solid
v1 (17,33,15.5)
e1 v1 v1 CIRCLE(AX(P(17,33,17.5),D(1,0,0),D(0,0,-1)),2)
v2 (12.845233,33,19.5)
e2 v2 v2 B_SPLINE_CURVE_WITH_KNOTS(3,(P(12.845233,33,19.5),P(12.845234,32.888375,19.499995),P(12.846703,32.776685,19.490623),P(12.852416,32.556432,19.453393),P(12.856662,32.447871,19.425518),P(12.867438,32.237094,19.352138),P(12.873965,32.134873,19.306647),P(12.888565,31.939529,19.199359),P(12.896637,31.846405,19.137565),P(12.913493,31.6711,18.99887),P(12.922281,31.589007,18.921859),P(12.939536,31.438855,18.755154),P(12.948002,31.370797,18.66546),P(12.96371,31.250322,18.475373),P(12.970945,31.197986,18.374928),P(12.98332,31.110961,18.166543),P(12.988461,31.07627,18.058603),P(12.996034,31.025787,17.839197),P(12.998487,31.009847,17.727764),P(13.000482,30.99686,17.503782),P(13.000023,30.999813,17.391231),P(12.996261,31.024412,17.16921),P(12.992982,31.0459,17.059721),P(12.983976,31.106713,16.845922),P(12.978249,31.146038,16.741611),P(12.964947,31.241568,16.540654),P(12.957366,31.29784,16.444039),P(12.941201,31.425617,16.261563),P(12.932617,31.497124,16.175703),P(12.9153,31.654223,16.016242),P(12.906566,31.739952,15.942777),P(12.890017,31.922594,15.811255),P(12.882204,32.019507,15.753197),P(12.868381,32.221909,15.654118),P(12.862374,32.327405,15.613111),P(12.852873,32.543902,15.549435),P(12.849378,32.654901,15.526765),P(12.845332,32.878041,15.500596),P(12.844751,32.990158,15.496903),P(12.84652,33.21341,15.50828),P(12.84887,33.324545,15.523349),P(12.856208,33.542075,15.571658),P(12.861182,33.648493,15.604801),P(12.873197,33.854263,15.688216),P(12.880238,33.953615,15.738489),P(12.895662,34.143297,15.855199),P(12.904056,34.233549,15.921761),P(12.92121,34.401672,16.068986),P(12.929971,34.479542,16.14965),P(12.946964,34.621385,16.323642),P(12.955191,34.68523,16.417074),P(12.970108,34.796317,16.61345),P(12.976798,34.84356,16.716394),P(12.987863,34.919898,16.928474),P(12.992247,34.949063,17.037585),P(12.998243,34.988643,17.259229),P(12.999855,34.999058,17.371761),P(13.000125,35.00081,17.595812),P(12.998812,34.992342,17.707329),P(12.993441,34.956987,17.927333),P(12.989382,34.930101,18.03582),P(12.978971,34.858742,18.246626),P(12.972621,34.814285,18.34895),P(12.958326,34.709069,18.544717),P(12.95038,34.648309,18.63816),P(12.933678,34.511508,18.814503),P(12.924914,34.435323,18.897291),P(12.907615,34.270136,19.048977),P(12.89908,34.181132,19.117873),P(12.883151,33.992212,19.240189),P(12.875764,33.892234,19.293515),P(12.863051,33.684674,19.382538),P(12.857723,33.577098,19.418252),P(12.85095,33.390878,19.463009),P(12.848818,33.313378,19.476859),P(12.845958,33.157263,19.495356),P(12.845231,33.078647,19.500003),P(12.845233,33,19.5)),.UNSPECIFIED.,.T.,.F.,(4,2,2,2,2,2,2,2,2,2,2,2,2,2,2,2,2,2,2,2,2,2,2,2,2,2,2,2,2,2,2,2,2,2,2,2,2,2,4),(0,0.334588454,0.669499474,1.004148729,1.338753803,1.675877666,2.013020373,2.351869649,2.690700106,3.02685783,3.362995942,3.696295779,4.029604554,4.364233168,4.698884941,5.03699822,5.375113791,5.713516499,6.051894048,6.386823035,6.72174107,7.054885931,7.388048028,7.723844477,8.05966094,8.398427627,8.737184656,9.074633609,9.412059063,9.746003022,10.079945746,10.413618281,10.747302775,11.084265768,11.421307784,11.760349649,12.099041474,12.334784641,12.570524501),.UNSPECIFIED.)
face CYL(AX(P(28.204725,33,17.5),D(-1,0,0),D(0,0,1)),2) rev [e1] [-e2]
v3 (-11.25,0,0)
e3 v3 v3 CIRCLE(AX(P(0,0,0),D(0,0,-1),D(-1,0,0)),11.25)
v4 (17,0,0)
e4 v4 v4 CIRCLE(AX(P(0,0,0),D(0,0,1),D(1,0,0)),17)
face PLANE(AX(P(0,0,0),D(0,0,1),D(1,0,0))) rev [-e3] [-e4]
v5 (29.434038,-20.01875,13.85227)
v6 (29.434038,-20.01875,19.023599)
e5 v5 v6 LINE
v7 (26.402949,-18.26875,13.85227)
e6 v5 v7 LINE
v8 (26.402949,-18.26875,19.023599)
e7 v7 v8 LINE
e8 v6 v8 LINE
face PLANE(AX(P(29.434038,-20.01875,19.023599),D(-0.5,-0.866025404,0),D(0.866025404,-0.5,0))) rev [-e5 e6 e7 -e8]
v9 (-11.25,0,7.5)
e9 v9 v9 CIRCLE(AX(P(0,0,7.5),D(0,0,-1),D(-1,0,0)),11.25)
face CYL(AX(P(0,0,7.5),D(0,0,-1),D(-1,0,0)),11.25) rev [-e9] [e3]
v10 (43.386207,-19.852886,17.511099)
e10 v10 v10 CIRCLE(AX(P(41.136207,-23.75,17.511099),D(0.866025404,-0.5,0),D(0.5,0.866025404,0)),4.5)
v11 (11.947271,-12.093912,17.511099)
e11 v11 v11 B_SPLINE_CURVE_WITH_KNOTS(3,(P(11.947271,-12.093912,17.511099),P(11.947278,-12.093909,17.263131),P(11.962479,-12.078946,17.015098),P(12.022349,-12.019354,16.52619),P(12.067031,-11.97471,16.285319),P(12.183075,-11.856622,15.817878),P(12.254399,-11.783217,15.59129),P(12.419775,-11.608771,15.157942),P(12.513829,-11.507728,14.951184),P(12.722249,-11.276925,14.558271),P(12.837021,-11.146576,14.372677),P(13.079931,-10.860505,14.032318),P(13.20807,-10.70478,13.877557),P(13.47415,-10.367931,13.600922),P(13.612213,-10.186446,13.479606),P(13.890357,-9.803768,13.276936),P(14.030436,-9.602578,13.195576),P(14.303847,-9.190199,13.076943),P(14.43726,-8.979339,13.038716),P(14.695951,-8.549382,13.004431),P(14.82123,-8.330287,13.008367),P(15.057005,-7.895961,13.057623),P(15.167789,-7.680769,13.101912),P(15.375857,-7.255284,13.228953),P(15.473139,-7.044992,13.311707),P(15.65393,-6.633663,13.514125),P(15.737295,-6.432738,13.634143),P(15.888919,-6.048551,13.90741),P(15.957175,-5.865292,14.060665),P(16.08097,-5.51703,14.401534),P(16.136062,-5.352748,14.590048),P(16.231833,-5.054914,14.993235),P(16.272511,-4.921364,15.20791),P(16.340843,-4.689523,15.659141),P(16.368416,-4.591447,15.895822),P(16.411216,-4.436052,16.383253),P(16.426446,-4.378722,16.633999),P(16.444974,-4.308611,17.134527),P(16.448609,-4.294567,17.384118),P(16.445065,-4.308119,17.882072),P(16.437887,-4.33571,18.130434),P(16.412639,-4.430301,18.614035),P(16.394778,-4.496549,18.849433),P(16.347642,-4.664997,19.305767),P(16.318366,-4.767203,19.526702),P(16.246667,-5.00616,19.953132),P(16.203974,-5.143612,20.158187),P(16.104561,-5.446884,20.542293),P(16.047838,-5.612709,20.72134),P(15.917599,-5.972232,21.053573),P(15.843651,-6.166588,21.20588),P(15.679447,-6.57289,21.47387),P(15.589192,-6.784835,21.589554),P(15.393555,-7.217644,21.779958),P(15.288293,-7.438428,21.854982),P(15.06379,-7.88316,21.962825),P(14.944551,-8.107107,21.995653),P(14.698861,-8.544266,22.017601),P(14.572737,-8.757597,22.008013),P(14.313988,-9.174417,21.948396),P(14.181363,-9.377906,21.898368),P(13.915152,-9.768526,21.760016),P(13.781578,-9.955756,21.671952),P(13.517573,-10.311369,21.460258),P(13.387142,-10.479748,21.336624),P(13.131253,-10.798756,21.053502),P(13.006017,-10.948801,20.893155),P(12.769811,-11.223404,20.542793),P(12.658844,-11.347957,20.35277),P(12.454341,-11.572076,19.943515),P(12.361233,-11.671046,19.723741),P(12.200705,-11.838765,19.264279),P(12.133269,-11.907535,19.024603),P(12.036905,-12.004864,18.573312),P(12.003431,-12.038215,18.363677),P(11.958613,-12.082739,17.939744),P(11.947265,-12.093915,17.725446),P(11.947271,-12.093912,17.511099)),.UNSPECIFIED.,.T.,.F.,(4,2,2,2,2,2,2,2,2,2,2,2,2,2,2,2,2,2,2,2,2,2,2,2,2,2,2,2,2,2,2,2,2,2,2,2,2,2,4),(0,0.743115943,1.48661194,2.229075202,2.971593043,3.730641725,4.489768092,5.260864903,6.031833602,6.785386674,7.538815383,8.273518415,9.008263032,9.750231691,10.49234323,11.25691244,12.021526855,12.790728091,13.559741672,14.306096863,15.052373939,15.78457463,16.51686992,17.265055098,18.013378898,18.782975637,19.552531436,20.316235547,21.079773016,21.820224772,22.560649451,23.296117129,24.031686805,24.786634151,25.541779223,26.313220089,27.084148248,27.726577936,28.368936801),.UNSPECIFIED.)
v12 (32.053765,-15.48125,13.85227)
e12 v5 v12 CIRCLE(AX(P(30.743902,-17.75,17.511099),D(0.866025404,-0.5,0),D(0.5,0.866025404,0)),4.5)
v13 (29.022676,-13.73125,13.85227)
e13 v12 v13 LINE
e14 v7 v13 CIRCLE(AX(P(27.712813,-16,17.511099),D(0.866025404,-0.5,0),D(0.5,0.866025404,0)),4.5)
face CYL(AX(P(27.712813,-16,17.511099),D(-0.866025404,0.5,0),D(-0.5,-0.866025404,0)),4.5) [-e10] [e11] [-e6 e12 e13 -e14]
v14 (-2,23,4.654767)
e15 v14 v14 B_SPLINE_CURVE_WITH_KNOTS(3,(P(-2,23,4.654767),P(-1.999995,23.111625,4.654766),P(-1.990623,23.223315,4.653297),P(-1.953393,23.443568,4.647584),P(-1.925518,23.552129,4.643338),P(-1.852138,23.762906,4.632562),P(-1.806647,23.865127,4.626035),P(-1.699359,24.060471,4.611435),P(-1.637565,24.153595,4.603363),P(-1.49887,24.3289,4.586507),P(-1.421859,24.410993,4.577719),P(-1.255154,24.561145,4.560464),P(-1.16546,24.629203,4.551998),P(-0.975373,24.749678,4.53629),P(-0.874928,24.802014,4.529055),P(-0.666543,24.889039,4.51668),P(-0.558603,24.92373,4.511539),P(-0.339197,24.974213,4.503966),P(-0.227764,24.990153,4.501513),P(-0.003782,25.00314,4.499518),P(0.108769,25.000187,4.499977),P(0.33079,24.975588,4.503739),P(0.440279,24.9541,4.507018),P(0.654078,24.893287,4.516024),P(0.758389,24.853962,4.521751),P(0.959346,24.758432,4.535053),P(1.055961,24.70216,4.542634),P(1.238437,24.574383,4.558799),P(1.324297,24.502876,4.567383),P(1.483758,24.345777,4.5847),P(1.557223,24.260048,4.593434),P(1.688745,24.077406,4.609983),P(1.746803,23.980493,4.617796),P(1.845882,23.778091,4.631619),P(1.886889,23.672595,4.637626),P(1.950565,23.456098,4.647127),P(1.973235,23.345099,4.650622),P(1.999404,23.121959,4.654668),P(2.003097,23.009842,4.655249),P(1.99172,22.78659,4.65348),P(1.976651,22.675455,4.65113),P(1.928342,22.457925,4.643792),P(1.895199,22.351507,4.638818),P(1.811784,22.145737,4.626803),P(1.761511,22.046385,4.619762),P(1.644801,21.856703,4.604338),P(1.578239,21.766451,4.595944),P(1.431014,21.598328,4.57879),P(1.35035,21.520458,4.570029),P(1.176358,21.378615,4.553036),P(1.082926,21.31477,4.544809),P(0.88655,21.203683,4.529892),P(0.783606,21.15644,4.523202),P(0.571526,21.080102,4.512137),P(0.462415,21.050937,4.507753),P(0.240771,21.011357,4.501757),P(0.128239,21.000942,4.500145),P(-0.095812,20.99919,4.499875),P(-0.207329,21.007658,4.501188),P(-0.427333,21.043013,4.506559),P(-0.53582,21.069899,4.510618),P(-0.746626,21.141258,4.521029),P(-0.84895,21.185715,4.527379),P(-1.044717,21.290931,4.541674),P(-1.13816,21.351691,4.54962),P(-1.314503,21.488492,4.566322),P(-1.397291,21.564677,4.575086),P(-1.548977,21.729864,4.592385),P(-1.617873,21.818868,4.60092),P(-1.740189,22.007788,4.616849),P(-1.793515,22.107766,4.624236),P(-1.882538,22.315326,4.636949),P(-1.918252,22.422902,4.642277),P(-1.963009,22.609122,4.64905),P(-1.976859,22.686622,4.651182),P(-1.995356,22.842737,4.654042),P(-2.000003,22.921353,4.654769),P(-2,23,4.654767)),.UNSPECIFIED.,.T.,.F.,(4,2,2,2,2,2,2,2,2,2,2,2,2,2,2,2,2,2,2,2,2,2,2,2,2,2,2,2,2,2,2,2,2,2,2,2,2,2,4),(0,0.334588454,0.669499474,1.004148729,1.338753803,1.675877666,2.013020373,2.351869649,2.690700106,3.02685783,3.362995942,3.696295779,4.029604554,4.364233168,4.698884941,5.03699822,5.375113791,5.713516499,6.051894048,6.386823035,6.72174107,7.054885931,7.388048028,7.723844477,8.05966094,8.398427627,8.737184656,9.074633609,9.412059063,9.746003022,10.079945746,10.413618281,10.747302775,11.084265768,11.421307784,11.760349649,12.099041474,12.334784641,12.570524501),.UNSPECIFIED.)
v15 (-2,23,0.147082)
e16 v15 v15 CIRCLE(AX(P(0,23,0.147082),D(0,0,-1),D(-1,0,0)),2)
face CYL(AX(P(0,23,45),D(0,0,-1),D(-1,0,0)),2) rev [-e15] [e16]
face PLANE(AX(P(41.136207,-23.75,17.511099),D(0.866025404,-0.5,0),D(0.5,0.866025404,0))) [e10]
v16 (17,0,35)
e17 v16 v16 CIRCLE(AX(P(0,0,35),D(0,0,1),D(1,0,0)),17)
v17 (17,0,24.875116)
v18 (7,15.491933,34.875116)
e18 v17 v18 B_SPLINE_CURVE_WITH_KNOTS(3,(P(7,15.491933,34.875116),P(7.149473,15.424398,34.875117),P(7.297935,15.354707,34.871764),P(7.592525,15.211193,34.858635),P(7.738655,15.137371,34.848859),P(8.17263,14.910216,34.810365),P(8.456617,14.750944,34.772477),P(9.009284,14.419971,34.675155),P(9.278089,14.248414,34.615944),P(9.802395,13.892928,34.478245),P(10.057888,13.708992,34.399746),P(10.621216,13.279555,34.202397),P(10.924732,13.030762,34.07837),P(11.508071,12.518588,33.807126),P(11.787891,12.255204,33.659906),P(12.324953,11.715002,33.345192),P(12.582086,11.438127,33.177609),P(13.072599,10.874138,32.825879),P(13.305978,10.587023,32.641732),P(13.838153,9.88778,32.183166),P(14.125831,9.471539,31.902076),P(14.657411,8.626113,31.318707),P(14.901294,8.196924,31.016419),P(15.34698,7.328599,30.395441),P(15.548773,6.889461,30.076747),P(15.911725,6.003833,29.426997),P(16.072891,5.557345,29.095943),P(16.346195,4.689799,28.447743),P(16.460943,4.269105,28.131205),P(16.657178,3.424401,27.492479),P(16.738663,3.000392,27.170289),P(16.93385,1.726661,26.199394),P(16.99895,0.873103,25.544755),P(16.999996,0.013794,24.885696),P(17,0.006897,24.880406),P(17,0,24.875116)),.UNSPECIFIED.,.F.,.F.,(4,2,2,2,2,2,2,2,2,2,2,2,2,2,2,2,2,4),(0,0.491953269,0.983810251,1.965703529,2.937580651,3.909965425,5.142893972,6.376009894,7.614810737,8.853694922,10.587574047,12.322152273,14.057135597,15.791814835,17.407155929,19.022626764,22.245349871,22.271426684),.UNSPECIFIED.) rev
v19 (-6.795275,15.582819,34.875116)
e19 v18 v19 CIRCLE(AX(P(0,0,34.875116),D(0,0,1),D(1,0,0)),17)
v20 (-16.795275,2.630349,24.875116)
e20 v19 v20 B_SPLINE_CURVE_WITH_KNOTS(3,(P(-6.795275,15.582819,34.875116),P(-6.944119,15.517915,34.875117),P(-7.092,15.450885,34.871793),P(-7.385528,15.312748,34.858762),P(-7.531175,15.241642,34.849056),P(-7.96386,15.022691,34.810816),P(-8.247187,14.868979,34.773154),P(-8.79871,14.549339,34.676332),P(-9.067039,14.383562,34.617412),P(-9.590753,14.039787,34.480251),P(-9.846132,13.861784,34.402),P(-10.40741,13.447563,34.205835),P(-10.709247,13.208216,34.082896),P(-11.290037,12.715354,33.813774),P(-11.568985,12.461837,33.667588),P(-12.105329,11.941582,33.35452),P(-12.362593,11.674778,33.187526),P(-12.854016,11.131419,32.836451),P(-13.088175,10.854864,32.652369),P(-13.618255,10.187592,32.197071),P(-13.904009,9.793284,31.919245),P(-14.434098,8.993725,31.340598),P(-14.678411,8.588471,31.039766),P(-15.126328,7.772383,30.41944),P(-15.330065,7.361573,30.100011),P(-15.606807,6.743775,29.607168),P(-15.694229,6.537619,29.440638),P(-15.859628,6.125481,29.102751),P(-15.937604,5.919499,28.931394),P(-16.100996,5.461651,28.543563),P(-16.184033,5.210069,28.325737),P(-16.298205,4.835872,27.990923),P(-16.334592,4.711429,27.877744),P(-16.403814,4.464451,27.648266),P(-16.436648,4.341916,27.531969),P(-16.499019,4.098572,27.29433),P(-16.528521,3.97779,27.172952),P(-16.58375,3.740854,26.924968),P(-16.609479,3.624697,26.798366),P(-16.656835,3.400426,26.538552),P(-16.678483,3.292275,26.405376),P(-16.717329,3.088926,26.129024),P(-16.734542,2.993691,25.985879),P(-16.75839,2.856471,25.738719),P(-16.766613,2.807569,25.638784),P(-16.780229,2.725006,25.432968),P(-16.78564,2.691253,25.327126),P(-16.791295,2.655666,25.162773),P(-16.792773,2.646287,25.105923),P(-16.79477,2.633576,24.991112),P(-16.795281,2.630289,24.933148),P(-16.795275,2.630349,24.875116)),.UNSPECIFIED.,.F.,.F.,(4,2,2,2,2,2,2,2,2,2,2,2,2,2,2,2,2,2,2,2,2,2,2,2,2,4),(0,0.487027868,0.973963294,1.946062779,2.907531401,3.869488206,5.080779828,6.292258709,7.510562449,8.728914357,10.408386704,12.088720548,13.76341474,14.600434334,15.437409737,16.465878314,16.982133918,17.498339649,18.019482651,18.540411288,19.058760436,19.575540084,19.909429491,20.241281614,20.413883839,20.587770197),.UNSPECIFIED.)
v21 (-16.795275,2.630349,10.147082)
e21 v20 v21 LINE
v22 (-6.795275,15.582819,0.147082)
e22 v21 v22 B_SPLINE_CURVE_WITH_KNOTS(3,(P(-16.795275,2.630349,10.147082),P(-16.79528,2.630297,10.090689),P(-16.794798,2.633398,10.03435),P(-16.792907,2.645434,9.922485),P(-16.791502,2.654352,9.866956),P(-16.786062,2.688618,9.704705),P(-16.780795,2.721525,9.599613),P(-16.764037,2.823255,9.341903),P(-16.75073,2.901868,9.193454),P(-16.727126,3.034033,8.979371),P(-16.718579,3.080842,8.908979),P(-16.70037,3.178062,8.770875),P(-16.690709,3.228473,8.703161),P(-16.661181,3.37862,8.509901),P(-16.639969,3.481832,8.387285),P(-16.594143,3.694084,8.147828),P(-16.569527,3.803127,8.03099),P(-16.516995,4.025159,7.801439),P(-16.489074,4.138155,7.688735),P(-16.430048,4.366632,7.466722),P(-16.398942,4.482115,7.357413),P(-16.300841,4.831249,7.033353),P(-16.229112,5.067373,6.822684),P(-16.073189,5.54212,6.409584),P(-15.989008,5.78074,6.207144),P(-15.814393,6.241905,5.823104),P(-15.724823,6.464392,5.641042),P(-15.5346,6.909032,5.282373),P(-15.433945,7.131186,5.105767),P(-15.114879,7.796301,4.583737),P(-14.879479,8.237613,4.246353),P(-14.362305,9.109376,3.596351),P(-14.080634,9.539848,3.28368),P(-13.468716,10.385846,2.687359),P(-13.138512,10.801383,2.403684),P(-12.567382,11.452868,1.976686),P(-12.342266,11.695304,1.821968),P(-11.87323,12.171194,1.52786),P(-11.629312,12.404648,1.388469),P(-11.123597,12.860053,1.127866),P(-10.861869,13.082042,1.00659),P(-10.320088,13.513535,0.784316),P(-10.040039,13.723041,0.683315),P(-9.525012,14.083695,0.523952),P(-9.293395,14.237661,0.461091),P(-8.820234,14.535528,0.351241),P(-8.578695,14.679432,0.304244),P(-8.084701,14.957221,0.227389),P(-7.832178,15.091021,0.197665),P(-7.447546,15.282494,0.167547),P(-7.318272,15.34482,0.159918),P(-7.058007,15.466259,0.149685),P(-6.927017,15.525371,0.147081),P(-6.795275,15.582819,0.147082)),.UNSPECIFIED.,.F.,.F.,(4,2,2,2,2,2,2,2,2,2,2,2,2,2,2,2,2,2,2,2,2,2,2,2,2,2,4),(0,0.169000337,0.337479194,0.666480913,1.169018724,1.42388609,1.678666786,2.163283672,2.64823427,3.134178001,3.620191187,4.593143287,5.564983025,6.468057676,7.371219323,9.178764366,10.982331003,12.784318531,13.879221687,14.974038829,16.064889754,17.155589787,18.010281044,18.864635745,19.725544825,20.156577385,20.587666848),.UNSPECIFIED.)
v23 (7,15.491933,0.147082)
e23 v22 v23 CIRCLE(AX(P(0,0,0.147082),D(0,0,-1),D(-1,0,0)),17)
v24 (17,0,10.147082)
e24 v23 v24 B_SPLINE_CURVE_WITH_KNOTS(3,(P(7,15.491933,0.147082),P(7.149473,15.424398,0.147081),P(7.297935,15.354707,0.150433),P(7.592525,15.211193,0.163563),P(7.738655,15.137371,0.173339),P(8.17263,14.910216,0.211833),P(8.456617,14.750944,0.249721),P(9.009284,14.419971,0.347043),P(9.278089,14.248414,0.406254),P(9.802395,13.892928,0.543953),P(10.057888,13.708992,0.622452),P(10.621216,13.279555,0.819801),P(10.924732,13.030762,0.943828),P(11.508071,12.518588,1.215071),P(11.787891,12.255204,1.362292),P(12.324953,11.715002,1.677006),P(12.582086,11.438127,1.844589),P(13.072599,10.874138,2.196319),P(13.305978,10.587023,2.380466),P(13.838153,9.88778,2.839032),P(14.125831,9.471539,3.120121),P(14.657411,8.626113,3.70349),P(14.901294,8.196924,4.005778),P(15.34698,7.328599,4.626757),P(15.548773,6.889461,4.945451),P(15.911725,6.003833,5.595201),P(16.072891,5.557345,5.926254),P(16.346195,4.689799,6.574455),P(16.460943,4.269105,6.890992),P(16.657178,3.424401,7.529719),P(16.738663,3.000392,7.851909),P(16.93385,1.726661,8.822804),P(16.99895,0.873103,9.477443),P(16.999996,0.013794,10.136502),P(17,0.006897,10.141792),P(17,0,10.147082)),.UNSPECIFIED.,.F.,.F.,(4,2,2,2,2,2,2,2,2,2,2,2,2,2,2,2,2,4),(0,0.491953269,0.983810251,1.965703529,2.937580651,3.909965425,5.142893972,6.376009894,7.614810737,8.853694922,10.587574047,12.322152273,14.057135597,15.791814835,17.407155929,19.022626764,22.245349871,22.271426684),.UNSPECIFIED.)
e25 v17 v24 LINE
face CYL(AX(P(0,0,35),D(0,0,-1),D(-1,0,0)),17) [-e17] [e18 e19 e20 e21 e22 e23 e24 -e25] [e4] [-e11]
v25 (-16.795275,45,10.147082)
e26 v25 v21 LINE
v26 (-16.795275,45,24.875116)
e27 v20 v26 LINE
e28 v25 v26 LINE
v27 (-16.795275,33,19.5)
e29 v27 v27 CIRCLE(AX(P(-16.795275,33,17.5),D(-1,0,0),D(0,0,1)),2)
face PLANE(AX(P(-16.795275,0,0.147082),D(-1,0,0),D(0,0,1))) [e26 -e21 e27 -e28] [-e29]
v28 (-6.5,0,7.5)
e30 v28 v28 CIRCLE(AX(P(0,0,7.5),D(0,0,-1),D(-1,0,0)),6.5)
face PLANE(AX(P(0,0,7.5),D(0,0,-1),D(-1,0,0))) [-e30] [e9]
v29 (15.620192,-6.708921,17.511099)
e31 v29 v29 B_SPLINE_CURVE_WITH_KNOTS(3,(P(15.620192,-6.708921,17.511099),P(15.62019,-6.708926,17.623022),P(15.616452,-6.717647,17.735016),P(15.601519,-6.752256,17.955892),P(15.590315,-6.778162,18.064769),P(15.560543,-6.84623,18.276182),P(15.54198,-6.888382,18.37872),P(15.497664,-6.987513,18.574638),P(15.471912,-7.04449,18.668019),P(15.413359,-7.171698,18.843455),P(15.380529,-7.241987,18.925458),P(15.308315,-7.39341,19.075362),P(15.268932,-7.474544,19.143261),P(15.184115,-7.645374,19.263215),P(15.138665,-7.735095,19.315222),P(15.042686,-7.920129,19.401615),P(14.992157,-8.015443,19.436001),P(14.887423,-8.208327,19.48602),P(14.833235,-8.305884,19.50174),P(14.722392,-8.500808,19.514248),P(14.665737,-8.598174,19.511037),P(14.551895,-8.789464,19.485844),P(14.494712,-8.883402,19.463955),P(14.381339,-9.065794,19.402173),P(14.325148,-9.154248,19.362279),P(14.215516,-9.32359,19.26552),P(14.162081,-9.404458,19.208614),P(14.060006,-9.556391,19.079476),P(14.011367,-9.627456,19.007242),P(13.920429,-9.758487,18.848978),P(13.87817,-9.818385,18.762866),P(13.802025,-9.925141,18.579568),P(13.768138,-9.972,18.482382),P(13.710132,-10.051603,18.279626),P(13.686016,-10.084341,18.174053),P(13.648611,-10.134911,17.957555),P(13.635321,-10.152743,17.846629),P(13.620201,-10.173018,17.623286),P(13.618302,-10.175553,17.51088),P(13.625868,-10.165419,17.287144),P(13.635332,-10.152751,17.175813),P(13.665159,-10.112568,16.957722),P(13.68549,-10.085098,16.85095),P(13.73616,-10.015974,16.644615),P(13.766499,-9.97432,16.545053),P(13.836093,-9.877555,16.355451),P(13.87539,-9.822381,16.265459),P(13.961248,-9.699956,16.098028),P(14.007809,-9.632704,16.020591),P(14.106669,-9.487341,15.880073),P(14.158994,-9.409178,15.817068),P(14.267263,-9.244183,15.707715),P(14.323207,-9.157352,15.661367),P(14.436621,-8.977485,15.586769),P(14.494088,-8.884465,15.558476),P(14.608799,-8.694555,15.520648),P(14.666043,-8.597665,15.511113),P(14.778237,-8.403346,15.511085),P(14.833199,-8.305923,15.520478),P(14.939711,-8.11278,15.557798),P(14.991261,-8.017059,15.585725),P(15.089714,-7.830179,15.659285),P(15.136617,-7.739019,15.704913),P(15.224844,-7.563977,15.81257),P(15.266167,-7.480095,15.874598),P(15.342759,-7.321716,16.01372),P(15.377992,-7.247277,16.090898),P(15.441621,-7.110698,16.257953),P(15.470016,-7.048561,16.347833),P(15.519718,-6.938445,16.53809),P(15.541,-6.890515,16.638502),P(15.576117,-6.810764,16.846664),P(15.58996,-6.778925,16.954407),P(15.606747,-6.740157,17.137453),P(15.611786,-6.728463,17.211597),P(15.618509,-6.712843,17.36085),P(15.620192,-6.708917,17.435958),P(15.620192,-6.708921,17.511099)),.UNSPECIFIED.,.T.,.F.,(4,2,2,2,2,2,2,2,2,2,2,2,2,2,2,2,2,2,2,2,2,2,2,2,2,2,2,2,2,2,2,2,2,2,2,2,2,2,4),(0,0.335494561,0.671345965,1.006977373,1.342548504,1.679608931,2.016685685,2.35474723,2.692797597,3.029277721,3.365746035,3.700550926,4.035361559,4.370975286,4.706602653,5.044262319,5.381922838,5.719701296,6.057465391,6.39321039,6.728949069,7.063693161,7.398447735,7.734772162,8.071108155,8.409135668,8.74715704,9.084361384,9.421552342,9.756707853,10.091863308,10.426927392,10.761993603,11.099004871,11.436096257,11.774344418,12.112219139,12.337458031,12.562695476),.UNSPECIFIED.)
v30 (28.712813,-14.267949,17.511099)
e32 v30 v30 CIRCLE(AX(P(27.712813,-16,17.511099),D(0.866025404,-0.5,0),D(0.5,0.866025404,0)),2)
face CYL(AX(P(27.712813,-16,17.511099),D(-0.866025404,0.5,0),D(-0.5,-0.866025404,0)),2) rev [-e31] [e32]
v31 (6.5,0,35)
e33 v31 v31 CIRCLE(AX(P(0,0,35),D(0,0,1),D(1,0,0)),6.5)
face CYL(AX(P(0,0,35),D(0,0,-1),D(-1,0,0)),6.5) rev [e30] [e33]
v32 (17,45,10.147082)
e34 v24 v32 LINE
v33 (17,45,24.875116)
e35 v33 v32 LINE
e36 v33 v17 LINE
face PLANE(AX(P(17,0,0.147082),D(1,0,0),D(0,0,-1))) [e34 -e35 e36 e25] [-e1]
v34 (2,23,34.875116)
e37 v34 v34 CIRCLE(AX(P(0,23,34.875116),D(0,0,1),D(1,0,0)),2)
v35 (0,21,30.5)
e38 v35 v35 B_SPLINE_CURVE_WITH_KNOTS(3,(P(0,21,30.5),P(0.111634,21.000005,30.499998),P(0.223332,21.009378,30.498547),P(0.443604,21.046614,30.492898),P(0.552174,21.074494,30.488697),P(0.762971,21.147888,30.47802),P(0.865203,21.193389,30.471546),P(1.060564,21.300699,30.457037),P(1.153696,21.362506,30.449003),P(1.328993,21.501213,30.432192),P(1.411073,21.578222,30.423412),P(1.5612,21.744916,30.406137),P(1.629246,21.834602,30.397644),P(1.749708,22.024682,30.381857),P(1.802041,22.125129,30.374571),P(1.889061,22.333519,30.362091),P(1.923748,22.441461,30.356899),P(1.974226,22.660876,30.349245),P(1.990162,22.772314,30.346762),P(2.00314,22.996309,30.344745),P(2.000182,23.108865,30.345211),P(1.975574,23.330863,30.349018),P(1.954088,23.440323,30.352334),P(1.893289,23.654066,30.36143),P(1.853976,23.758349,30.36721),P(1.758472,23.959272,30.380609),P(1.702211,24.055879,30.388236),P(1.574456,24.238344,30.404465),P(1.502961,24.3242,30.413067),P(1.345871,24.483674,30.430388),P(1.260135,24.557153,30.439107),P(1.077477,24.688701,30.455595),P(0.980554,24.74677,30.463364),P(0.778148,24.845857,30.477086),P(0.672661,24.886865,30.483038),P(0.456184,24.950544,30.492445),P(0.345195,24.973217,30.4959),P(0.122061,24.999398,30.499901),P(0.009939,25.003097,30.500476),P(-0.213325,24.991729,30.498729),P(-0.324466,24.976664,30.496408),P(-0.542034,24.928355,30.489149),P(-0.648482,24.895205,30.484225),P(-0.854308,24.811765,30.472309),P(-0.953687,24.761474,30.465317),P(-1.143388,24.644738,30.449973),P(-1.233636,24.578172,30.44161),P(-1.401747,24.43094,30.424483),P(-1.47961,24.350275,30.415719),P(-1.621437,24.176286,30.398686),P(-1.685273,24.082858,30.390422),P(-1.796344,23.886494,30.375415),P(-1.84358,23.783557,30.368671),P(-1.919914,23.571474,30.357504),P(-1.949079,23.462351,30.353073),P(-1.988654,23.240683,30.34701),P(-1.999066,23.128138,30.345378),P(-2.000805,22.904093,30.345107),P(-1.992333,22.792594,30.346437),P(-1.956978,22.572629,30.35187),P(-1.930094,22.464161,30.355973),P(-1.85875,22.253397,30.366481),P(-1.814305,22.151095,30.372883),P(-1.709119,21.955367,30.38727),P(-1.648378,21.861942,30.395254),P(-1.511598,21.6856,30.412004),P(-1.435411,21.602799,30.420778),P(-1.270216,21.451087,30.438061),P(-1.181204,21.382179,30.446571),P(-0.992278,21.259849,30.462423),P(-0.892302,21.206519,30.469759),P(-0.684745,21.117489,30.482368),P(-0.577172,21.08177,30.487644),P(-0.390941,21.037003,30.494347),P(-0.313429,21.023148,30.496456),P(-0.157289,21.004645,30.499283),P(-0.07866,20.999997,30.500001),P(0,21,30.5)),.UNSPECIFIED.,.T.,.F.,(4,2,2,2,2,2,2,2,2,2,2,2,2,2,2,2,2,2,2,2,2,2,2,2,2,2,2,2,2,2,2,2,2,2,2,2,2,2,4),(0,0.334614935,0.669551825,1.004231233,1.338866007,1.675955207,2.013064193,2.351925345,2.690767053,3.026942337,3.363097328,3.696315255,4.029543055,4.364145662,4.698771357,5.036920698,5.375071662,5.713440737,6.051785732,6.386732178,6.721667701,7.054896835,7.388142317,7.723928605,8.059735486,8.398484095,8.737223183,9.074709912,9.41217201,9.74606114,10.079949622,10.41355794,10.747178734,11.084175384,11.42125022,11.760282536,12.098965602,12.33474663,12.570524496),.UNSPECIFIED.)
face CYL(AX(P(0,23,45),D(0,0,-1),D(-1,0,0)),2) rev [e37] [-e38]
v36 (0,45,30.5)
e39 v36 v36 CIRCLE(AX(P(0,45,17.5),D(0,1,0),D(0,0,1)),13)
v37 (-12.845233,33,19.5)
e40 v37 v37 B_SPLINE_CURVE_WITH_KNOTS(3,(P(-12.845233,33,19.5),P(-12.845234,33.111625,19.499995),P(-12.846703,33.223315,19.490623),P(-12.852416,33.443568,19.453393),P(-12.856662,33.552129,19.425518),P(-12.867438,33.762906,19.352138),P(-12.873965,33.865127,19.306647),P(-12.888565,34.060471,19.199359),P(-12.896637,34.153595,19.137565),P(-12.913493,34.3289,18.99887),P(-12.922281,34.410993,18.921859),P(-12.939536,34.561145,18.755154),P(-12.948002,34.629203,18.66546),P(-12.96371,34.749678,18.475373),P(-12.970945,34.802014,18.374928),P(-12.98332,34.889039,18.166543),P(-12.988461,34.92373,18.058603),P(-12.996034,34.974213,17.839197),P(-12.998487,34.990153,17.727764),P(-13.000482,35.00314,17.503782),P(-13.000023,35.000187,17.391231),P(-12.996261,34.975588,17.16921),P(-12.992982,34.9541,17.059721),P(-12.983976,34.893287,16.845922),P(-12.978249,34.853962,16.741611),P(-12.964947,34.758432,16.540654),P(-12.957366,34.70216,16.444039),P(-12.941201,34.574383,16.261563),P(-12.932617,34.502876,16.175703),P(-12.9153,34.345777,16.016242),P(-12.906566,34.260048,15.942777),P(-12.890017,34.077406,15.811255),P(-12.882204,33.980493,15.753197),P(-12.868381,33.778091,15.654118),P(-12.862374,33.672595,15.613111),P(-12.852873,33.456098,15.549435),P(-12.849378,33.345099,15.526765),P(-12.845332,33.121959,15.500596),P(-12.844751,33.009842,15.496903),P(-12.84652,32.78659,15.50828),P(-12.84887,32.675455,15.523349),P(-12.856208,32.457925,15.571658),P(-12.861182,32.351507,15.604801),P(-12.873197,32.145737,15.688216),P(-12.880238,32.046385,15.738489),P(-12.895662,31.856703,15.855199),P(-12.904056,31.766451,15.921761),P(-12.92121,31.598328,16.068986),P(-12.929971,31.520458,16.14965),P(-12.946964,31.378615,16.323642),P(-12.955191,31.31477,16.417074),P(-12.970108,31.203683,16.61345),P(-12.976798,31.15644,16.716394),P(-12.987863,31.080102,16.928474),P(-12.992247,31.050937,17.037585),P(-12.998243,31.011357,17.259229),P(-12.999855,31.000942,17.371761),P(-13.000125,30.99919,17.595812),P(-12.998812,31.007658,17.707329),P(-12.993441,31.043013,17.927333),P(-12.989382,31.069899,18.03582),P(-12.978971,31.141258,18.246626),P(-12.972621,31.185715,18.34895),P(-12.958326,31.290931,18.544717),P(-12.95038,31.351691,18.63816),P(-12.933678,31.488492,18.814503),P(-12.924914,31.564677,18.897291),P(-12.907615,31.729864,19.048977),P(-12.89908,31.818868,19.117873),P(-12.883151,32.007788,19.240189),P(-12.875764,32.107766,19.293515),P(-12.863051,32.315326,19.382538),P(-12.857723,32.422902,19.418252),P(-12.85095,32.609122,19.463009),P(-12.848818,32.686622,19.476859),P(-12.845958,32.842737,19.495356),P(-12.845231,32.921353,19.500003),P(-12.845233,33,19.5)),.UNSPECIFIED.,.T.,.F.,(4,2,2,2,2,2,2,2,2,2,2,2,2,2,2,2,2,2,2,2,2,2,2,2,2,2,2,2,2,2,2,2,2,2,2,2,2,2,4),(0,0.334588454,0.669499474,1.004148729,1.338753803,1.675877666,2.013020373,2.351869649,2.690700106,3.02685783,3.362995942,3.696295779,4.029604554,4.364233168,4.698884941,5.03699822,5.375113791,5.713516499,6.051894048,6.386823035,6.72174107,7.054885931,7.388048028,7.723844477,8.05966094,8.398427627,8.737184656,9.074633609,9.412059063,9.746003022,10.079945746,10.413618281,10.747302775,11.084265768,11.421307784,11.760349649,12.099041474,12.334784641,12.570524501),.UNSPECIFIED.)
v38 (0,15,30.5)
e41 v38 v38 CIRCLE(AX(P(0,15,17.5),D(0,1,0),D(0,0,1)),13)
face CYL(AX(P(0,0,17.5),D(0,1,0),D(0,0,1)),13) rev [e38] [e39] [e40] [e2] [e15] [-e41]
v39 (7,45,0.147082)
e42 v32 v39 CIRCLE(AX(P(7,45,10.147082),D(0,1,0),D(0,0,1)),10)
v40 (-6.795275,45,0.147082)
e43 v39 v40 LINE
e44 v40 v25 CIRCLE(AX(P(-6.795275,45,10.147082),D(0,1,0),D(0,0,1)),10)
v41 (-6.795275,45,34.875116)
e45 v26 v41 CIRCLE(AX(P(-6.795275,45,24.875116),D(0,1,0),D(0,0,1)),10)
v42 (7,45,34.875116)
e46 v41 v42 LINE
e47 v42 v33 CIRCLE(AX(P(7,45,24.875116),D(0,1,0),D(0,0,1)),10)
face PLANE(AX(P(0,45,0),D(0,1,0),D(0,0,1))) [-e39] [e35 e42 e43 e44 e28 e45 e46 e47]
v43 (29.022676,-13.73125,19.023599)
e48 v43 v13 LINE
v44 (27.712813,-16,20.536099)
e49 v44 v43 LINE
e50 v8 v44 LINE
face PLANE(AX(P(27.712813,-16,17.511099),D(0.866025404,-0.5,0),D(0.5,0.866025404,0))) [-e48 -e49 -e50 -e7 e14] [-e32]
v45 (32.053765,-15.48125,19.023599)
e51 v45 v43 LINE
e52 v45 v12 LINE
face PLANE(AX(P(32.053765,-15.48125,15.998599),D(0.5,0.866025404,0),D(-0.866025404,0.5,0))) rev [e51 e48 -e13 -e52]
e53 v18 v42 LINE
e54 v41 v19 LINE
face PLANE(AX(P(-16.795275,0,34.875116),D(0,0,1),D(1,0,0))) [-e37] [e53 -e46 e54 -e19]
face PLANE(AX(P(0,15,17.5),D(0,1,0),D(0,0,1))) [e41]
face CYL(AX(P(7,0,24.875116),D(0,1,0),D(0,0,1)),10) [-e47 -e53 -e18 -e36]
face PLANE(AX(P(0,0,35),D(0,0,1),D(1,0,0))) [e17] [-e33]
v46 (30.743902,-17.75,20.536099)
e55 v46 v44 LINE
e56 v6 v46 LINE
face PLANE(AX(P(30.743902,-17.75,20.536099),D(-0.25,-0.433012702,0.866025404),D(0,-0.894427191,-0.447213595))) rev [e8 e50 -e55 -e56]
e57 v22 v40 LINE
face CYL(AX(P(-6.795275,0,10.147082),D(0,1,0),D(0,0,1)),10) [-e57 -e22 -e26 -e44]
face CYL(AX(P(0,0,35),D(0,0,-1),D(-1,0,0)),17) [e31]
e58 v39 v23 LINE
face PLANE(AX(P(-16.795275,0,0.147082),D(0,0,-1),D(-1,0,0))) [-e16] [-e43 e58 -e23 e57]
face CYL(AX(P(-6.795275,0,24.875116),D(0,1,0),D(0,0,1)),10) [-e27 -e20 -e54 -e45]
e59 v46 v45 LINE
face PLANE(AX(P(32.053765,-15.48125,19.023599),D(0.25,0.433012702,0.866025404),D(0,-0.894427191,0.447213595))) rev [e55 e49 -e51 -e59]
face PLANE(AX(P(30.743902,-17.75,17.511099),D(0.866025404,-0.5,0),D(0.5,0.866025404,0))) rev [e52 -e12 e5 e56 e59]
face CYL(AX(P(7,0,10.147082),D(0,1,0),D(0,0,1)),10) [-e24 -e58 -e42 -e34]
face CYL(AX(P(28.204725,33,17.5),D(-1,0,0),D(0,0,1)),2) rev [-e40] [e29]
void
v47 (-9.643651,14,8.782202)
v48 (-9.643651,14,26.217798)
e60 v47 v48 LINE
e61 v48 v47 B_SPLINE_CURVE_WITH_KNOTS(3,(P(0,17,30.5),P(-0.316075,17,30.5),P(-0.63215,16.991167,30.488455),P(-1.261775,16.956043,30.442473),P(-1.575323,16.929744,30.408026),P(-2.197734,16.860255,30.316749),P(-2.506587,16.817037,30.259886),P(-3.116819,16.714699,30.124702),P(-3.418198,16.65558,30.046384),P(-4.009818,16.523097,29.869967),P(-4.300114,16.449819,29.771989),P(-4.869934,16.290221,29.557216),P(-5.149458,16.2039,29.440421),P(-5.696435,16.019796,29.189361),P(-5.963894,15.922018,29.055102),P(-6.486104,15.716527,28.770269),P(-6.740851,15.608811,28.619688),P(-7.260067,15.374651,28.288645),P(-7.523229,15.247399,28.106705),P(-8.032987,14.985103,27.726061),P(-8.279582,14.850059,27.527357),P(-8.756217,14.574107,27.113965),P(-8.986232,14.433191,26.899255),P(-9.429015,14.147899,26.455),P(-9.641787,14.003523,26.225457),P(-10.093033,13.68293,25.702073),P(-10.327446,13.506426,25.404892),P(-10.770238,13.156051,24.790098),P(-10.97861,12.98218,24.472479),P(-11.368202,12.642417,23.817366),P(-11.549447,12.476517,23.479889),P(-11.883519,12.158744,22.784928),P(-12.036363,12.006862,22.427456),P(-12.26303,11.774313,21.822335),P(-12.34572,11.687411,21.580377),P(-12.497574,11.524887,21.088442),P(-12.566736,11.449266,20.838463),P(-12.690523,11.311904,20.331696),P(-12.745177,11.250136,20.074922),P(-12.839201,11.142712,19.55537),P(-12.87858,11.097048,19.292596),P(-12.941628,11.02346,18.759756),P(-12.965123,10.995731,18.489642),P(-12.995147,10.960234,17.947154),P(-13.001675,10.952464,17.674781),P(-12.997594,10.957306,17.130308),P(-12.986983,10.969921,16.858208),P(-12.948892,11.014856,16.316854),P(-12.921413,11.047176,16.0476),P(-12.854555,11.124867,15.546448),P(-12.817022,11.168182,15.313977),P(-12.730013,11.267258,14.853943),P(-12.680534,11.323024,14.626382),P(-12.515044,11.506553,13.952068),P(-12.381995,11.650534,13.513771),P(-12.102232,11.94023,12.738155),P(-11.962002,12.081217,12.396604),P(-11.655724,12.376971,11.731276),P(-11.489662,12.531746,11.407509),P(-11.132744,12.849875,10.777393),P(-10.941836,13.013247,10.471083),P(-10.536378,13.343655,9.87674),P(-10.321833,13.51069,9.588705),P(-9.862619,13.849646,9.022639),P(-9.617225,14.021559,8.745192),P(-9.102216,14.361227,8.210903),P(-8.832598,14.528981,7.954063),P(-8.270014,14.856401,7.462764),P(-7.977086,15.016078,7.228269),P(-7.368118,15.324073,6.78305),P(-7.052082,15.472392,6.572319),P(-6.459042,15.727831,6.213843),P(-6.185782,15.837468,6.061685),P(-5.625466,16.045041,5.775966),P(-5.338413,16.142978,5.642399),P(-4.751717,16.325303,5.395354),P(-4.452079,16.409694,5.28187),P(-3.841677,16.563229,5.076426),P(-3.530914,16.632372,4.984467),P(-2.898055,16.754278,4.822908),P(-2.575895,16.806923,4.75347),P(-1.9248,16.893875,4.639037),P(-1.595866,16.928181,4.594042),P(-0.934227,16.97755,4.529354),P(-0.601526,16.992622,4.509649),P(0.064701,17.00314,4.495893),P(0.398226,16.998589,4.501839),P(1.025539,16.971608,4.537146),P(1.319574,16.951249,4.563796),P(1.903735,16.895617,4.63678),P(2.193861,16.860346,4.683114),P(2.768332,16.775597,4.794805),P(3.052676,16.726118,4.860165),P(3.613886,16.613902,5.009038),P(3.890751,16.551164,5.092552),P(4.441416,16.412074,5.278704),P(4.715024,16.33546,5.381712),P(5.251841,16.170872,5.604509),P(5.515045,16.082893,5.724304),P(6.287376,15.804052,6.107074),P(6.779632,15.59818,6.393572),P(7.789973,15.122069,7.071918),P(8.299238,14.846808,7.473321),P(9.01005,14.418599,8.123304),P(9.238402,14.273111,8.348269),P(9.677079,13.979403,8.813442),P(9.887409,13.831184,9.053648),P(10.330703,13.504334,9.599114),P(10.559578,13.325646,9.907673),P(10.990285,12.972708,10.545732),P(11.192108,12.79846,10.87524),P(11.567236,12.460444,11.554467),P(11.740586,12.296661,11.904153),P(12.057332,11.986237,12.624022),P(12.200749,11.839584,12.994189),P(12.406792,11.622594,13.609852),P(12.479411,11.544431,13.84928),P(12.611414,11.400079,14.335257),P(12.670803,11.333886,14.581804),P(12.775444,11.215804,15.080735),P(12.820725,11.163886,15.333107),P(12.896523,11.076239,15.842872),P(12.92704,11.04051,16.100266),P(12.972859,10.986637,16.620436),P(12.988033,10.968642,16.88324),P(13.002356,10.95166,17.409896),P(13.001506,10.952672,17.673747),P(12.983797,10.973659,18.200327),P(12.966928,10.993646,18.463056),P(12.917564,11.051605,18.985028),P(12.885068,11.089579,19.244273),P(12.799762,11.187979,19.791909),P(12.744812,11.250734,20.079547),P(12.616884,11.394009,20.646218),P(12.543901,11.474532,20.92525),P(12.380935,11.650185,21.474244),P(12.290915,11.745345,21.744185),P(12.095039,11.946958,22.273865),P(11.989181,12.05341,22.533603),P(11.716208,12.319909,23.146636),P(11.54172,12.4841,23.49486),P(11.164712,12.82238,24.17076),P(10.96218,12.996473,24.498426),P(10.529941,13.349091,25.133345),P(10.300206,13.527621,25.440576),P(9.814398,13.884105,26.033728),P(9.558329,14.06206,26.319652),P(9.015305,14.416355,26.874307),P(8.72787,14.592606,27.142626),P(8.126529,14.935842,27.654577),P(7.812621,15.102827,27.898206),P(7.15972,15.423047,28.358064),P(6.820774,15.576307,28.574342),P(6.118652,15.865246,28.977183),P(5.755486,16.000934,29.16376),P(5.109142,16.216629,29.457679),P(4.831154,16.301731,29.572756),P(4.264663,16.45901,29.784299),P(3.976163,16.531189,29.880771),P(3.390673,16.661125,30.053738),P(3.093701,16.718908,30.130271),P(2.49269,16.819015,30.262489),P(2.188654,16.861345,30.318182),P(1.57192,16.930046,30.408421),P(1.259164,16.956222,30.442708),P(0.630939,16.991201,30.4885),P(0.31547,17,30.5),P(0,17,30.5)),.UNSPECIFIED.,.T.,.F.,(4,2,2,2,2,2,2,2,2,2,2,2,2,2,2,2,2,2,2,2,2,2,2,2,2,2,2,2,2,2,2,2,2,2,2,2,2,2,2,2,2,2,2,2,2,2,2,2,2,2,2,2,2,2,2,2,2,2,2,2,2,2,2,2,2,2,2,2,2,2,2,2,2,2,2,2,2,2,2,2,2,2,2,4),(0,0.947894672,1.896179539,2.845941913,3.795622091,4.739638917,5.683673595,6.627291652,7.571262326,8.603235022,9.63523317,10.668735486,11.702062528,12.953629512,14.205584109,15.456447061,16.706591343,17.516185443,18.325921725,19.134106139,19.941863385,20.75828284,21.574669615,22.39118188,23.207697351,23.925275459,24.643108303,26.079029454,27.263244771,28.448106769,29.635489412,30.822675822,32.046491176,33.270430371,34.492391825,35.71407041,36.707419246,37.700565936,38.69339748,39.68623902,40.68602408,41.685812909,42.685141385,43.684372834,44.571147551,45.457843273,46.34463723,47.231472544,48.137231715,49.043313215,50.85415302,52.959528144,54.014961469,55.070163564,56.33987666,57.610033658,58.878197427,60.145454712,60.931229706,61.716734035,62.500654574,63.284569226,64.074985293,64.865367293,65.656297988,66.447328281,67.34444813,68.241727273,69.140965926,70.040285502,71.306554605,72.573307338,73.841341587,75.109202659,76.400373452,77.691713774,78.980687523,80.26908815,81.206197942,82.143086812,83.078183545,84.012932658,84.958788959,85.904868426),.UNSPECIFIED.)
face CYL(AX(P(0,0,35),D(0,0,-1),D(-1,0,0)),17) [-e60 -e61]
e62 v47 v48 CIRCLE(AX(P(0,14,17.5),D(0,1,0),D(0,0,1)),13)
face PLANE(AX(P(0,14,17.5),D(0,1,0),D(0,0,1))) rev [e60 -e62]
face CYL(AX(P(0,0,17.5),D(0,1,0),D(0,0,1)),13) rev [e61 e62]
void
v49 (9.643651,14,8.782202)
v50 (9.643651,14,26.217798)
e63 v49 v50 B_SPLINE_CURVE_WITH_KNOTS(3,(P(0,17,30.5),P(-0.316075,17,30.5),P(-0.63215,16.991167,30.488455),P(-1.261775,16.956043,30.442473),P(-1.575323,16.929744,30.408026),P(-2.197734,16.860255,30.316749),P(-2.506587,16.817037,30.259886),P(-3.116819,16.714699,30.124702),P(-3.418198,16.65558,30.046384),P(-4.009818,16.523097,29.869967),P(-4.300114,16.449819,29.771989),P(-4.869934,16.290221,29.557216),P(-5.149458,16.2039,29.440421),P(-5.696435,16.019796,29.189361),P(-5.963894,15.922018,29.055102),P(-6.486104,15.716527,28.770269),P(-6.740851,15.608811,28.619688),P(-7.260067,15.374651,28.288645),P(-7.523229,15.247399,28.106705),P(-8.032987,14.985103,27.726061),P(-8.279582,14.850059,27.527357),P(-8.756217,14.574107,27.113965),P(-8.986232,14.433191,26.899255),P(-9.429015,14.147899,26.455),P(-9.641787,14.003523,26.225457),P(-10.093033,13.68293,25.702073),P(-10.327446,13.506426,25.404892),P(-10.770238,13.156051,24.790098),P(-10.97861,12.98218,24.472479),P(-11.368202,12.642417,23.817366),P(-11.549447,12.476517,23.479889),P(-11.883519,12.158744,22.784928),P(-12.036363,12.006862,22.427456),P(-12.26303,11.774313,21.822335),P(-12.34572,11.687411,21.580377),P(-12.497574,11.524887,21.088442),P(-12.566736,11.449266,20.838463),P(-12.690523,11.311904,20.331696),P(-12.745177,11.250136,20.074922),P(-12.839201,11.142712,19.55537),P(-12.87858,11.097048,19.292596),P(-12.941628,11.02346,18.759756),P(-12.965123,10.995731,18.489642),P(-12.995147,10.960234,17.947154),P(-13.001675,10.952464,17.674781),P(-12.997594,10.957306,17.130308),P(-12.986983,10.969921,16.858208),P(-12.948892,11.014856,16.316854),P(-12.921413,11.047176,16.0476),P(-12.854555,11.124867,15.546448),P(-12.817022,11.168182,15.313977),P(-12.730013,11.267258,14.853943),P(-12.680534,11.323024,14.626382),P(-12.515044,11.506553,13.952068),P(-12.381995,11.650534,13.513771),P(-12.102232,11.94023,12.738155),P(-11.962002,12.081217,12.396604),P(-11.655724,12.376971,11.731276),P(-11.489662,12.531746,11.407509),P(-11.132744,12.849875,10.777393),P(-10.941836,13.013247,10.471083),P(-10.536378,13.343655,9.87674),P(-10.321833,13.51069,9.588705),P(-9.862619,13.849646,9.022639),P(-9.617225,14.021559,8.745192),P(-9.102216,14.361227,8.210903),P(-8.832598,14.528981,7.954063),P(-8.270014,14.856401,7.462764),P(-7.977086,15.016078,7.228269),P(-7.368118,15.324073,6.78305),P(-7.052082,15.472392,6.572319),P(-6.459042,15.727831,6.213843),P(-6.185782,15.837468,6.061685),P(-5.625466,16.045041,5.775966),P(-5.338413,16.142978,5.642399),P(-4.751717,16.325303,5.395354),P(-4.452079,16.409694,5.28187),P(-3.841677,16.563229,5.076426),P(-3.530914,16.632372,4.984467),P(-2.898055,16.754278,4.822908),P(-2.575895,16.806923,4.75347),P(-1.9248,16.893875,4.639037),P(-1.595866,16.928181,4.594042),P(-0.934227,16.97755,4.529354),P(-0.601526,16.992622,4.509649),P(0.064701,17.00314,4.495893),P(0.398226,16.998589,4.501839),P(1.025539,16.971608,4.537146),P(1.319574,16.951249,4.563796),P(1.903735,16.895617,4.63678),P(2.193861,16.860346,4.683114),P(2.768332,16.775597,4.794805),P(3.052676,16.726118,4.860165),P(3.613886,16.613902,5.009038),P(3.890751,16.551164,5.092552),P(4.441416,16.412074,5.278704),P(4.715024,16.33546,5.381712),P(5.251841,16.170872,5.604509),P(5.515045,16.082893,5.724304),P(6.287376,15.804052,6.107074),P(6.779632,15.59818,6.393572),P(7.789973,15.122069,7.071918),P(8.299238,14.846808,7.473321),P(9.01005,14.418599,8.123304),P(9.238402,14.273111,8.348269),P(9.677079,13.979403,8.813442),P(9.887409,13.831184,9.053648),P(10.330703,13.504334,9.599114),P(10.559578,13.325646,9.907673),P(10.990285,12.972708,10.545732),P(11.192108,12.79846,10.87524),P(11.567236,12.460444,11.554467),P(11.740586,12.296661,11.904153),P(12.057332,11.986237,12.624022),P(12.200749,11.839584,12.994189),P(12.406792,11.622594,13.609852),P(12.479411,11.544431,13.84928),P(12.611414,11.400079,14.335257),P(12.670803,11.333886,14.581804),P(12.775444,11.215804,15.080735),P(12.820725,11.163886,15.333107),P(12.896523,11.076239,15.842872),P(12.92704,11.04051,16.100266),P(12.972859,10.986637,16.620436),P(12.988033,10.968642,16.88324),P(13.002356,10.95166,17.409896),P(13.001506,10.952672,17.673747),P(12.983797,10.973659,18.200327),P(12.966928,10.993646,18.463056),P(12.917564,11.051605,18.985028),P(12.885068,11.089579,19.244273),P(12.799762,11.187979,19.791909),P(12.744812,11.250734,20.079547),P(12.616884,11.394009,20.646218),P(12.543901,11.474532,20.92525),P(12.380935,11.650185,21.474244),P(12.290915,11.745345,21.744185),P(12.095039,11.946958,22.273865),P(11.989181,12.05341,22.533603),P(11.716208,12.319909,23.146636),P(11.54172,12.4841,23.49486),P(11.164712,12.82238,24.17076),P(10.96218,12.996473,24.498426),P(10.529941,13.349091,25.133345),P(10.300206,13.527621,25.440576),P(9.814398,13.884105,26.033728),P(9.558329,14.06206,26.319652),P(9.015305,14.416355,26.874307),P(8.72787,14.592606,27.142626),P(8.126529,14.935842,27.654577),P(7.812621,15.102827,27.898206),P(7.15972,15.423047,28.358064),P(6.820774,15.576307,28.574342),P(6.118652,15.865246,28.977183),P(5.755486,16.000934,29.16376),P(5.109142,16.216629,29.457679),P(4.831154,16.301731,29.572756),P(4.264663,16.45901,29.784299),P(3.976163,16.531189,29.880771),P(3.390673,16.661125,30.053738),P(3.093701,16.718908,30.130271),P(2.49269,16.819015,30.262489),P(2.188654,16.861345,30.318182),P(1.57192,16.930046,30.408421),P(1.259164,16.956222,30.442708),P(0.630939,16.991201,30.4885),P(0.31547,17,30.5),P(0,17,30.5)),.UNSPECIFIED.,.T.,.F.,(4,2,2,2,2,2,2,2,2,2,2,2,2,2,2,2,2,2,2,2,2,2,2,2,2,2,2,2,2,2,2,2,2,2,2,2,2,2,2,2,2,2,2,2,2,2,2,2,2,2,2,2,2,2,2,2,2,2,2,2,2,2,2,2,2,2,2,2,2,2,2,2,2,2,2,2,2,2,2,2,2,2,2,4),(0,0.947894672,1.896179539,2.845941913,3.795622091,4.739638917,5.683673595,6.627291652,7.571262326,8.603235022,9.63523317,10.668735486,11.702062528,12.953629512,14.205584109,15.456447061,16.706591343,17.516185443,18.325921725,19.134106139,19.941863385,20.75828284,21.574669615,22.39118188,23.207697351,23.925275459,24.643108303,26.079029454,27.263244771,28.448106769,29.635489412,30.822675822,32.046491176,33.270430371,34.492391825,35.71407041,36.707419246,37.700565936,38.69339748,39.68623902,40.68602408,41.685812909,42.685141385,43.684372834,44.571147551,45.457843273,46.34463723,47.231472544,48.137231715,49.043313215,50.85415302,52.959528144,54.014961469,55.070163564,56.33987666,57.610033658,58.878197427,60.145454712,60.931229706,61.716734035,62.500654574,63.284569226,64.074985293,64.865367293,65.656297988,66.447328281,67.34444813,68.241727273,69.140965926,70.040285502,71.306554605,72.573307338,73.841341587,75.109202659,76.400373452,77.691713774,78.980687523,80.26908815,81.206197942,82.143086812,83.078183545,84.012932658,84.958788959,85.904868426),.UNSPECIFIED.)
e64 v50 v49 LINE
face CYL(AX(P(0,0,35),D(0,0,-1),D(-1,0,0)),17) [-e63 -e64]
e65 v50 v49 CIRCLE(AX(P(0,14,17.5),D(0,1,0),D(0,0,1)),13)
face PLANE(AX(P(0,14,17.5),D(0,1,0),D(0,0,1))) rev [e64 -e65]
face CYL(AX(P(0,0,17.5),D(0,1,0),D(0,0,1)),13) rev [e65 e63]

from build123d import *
from build123d.topology import SkipClean

# Parameters (mm, degrees)
SKETCH_1_R                        = 17
SKETCH_1_R_2                      = 6.5
EXTRUDE_2_DEPTH                   = 35
SKETCH_3_W                        = 33.795275063
SKETCH_3_H                        = 34.72803434
SKETCH_3_R                        = 13
EXTRUDE_7_DEPTH                   = 45
SKETCH_4_R                        = 6.5
CUT_EXTRUDE_1_DEPTH               = 60.489495005
SKETCH_12_R                       = 2
CUT_EXTRUDE_11_DEPTH              = 45
SKETCH_15_R                       = 2
CUT_EXTRUDE_12_DEPTH              = 45
FILLET_4_R                        = 10
SKETCH_20_R                       = 13
CUT_EXTRUDE_18_DEPTH              = 31
EXTRUDE_START                     = 1
SKETCH_25_R                       = 13
EXTRUDE_10_DEPTH                  = 1
SKETCH_26_R                       = 11.25
CUT_EXTRUDE_19_DEPTH              = 7.5
SKETCH_36_R                       = 4.5
SKETCH_36_R_2                     = 2
EXTRUDE_17_DEPTH                  = 15
EXTRUDE_17_DIRECTION_2_REACH      = 73.369
EXTRUDE_17_DIRECTION_2_END_RADIUS = 17
EXTRUDE_START_2                   = 3.5
EXTRUDE_18_DEPTH                  = 3.5
EXTRUDE_START_3                   = 12
SKETCH_41_R                       = 4.5
EXTRUDE_19_DEPTH                  = 12


with BuildPart() as part:
    # Эскиз1 → Бобышка-Вытянуть2 (new body)
    with BuildSketch(Plane.XY):
        Circle(SKETCH_1_R)
        Circle(SKETCH_1_R_2, mode=Mode.SUBTRACT)
    extrude(amount=EXTRUDE_2_DEPTH)

    # Эскиз3 → Бобышка-Вытянуть7 (add)
    with BuildSketch(Plane(origin=(0, 45, 0), x_dir=(1, 0, 0), z_dir=(0, 1, 0))):
        with Locations((0.102362468, -17.511098906)):
            Rectangle(SKETCH_3_W, SKETCH_3_H)
        with Locations(Location((0, -17.5, 0), (0, 0, 270))):
            Circle(SKETCH_3_R, mode=Mode.SUBTRACT)
    extrude(amount=-EXTRUDE_7_DEPTH)

    # Эскиз4 → Вырез-Вытянуть1 (cut, through all)
    with BuildSketch(Plane(origin=(0, 0, 0), x_dir=(-1, 0, 0), z_dir=(0, 0, -1))):
        with Locations(Location((0, 0, 0), (0, 0, 180))):
            Circle(SKETCH_4_R)
    extrude(amount=-CUT_EXTRUDE_1_DEPTH, mode=Mode.SUBTRACT)

    # Эскиз12 → Вырез-Вытянуть11 (cut)
    with BuildSketch(Plane(origin=(0, 0, 0), x_dir=(-1, 0, 0), z_dir=(0, 0, -1))):
        with Locations((0, 23)):
            Circle(SKETCH_12_R)
    extrude(amount=-CUT_EXTRUDE_11_DEPTH, mode=Mode.SUBTRACT)

    # Эскиз15 → Вырез-Вытянуть12 (cut)
    with BuildSketch(Plane.ZY.offset(16.795275063)):
        with Locations((17.5, 33)):
            Circle(SKETCH_15_R)
    extrude(amount=-CUT_EXTRUDE_12_DEPTH, mode=Mode.SUBTRACT)

    # Скругление4
    # the kernel refuses this fillet: 10 mm, written as the material it takes off along each edge
    with BuildSketch(Plane(origin=(-16.795275063, 70, 34.875116076), x_dir=(1, 0, 0), z_dir=(0, -1, 0))) as fillet_4_piece_1_section:
        with BuildLine():
            CenterArc((FILLET_4_R, -FILLET_4_R), FILLET_4_R, 90, 90)
            Line((0, -FILLET_4_R), (0, 0))
            Line((0, 0), (FILLET_4_R, 0))
        make_face()
    fillet_4_piece_1 = extrude(amount=92.369651061, mode=Mode.PRIVATE)
    fillet_4_piece_1 = fillet_4_piece_1 - Plane(origin=(0, 0, 32.54483178), x_dir=(1, 0, 0), z_dir=(0, 0, -1)) * Cylinder(17, 225, mode=Mode.PRIVATE)
    add(fillet_4_piece_1, mode=Mode.SUBTRACT)
    with BuildSketch(Plane(origin=(17, 70, 0.147081736), x_dir=(0, 0, 1), z_dir=(0, -1, 0))) as fillet_4_piece_2_section:
        with BuildLine():
            CenterArc((FILLET_4_R, FILLET_4_R), FILLET_4_R, 180, 90)
            Line((0, FILLET_4_R), (0, 0))
            Line((0, 0), (FILLET_4_R, 0))
        make_face()
    fillet_4_piece_2 = extrude(amount=95, mode=Mode.PRIVATE)
    fillet_4_piece_2 = fillet_4_piece_2 - Plane(origin=(0, 0, 2.486350956), x_dir=(1, 0, 0), z_dir=(0, 0, -1)) * Cylinder(17, 230, mode=Mode.PRIVATE)
    add(fillet_4_piece_2, mode=Mode.SUBTRACT)
    with BuildSketch(Plane(origin=(17, 70, 34.875116076), x_dir=(0, 0, -1), z_dir=(0, -1, 0))) as fillet_4_piece_3_section:
        with BuildLine():
            CenterArc((FILLET_4_R, -FILLET_4_R), FILLET_4_R, 90, 90)
            Line((0, -FILLET_4_R), (0, 0))
            Line((0, 0), (FILLET_4_R, 0))
        make_face()
    fillet_4_piece_3 = extrude(amount=95, mode=Mode.PRIVATE)
    fillet_4_piece_3 = fillet_4_piece_3 - Plane(origin=(0, 0, 32.535846855), x_dir=(1, 0, 0), z_dir=(0, 0, -1)) * Cylinder(17, 230, mode=Mode.PRIVATE)
    add(fillet_4_piece_3, mode=Mode.SUBTRACT)
    with BuildSketch(Plane(origin=(-16.795275063, 70, 0.147081736), x_dir=(0, 0, 1), z_dir=(0, -1, 0))) as fillet_4_piece_4_section:
        with BuildLine():
            CenterArc((FILLET_4_R, -FILLET_4_R), FILLET_4_R, 90, 90)
            Line((0, -FILLET_4_R), (0, 0))
            Line((0, 0), (FILLET_4_R, 0))
        make_face()
    fillet_4_piece_4 = extrude(amount=92.369651061, mode=Mode.PRIVATE)
    fillet_4_piece_4 = fillet_4_piece_4 - Plane(origin=(0, 0, 2.477367304), x_dir=(1, 0, 0), z_dir=(0, 0, -1)) * Cylinder(17, 225, mode=Mode.PRIVATE)
    add(fillet_4_piece_4, mode=Mode.SUBTRACT)

    # Эскиз20 → Вырез-Вытянуть18 (cut)
    with SkipClean():  # the faces are left unmerged after this step: merging them gives an invalid solid
        with BuildSketch(Plane(origin=(0, 45, 0), x_dir=(1, 0, 0), z_dir=(0, 1, 0))):
            with Locations(Location((0, -17.5, 0), (0, 0, 270))):
                Circle(SKETCH_20_R)
        extrude(amount=-CUT_EXTRUDE_18_DEPTH, mode=Mode.SUBTRACT)

    # Эскиз25 → Бобышка-Вытянуть10 (add)
    with BuildSketch(Plane(origin=(0, 14, 0), x_dir=(1, 0, 0), z_dir=(0, 1, 0)).offset(EXTRUDE_START)):
        with Locations(Location((0, -17.5, 0), (0, 0, 270))):
            Circle(SKETCH_25_R)
    extrude(amount=-EXTRUDE_10_DEPTH)

    # Эскиз26 → Вырез-Вытянуть19 (cut)
    with BuildSketch(Plane(origin=(0, 0, 0), x_dir=(-1, 0, 0), z_dir=(0, 0, -1))):
        Circle(SKETCH_26_R)
    extrude(amount=-CUT_EXTRUDE_19_DEPTH, mode=Mode.SUBTRACT)

    # Эскиз36 → Бобышка-Вытянуть17 (add)
    with BuildSketch(Plane(origin=(14.722431864, -8.5, 0), x_dir=(0, 0, -1), z_dir=(0.8660254037844346, -0.5000000000000071, 0))):
        with Locations(Location((-17.511098906, 0, 0), (0, 0, 270))):
            Circle(SKETCH_36_R)
        with Locations(Location((-17.511098906, 0, 0), (0, 0, 90))):
            Circle(SKETCH_36_R_2, mode=Mode.SUBTRACT)
    extrude(amount=EXTRUDE_17_DEPTH)

    # Бобышка-Вытянуть17 direction 2: up to this cylinder (the profile starts outside it)
    with SkipClean():  # the faces are left unmerged after this step: merging them gives an invalid solid
        extrude_17_direction_2_end = Plane(origin=(0, 0, 17.511099), z_dir=(0, 0, -1)) * Cylinder(EXTRUDE_17_DIRECTION_2_END_RADIUS, 181.738, mode=Mode.PRIVATE)
        # Эскиз36 → Бобышка-Вытянуть17 direction 2 (add, up to the surface)
        with BuildSketch(Plane(origin=(14.722431864, -8.5, 0), x_dir=(0, 0, -1), z_dir=(0.8660254037844346, -0.5000000000000071, 0)), mode=Mode.PRIVATE) as extrude_17_direction_2_sk1:
            with Locations(Location((-17.511098906, 0, 0), (0, 0, 270))):
                Circle(SKETCH_36_R)
            with Locations(Location((-17.511098906, 0, 0), (0, 0, 90))):
                Circle(SKETCH_36_R_2, mode=Mode.SUBTRACT)
        extrude_17_direction_2_tool1 = extrude(extrude_17_direction_2_sk1.sketch, amount=-EXTRUDE_17_DIRECTION_2_REACH, mode=Mode.PRIVATE) - extrude_17_direction_2_end
        add(extrude_17_direction_2_tool1.solids().sort_by_distance((16.908792, -4.713113, 17.511099))[0])
        add(extrude_17_direction_2_tool1.solids().sort_by_distance((16.908792, -4.713113, 17.511099))[1])

    # Эскиз40 → Бобышка-Вытянуть18 (add)
    with BuildSketch(Plane(origin=(27.712812921, -16, 0), x_dir=(0, 0, -1), z_dir=(0.8660254037844346, -0.5000000000000071, 0)).offset(EXTRUDE_START_2)):
        with BuildLine():
            Line((-15.998598906, 2.619726846), (-13.852269687, 2.619726846))
            ThreePointArc((-13.852269687, 2.619726846), (-22.011098906, 0), (-13.852269687, -2.619726846))
            Line((-13.852269687, -2.619726846), (-15.998598906, -2.619726846))
            Line((-15.998598906, -2.619726846), (-19.023598906, -2.619726846))
            Line((-19.023598906, -2.619726846), (-20.536098906, 0))
            Line((-20.536098906, 0), (-19.023598906, 2.619726846))
            Line((-19.023598906, 2.619726846), (-15.998598906, 2.619726846))
        make_face()
    extrude(amount=-EXTRUDE_18_DEPTH)

    # Эскиз41 → Бобышка-Вытянуть19 (add)
    with BuildSketch(Plane(origin=(30.743901834, -17.75, 0), x_dir=(0, 0, -1), z_dir=(0.8660254037844346, -0.5000000000000071, 0)).offset(EXTRUDE_START_3)):
        with Locations(Location((-17.511098906, 0, 0), (0, 0, 270))):
            Circle(SKETCH_41_R)
    extrude(amount=-EXTRUDE_19_DEPTH)


solid = part.part
